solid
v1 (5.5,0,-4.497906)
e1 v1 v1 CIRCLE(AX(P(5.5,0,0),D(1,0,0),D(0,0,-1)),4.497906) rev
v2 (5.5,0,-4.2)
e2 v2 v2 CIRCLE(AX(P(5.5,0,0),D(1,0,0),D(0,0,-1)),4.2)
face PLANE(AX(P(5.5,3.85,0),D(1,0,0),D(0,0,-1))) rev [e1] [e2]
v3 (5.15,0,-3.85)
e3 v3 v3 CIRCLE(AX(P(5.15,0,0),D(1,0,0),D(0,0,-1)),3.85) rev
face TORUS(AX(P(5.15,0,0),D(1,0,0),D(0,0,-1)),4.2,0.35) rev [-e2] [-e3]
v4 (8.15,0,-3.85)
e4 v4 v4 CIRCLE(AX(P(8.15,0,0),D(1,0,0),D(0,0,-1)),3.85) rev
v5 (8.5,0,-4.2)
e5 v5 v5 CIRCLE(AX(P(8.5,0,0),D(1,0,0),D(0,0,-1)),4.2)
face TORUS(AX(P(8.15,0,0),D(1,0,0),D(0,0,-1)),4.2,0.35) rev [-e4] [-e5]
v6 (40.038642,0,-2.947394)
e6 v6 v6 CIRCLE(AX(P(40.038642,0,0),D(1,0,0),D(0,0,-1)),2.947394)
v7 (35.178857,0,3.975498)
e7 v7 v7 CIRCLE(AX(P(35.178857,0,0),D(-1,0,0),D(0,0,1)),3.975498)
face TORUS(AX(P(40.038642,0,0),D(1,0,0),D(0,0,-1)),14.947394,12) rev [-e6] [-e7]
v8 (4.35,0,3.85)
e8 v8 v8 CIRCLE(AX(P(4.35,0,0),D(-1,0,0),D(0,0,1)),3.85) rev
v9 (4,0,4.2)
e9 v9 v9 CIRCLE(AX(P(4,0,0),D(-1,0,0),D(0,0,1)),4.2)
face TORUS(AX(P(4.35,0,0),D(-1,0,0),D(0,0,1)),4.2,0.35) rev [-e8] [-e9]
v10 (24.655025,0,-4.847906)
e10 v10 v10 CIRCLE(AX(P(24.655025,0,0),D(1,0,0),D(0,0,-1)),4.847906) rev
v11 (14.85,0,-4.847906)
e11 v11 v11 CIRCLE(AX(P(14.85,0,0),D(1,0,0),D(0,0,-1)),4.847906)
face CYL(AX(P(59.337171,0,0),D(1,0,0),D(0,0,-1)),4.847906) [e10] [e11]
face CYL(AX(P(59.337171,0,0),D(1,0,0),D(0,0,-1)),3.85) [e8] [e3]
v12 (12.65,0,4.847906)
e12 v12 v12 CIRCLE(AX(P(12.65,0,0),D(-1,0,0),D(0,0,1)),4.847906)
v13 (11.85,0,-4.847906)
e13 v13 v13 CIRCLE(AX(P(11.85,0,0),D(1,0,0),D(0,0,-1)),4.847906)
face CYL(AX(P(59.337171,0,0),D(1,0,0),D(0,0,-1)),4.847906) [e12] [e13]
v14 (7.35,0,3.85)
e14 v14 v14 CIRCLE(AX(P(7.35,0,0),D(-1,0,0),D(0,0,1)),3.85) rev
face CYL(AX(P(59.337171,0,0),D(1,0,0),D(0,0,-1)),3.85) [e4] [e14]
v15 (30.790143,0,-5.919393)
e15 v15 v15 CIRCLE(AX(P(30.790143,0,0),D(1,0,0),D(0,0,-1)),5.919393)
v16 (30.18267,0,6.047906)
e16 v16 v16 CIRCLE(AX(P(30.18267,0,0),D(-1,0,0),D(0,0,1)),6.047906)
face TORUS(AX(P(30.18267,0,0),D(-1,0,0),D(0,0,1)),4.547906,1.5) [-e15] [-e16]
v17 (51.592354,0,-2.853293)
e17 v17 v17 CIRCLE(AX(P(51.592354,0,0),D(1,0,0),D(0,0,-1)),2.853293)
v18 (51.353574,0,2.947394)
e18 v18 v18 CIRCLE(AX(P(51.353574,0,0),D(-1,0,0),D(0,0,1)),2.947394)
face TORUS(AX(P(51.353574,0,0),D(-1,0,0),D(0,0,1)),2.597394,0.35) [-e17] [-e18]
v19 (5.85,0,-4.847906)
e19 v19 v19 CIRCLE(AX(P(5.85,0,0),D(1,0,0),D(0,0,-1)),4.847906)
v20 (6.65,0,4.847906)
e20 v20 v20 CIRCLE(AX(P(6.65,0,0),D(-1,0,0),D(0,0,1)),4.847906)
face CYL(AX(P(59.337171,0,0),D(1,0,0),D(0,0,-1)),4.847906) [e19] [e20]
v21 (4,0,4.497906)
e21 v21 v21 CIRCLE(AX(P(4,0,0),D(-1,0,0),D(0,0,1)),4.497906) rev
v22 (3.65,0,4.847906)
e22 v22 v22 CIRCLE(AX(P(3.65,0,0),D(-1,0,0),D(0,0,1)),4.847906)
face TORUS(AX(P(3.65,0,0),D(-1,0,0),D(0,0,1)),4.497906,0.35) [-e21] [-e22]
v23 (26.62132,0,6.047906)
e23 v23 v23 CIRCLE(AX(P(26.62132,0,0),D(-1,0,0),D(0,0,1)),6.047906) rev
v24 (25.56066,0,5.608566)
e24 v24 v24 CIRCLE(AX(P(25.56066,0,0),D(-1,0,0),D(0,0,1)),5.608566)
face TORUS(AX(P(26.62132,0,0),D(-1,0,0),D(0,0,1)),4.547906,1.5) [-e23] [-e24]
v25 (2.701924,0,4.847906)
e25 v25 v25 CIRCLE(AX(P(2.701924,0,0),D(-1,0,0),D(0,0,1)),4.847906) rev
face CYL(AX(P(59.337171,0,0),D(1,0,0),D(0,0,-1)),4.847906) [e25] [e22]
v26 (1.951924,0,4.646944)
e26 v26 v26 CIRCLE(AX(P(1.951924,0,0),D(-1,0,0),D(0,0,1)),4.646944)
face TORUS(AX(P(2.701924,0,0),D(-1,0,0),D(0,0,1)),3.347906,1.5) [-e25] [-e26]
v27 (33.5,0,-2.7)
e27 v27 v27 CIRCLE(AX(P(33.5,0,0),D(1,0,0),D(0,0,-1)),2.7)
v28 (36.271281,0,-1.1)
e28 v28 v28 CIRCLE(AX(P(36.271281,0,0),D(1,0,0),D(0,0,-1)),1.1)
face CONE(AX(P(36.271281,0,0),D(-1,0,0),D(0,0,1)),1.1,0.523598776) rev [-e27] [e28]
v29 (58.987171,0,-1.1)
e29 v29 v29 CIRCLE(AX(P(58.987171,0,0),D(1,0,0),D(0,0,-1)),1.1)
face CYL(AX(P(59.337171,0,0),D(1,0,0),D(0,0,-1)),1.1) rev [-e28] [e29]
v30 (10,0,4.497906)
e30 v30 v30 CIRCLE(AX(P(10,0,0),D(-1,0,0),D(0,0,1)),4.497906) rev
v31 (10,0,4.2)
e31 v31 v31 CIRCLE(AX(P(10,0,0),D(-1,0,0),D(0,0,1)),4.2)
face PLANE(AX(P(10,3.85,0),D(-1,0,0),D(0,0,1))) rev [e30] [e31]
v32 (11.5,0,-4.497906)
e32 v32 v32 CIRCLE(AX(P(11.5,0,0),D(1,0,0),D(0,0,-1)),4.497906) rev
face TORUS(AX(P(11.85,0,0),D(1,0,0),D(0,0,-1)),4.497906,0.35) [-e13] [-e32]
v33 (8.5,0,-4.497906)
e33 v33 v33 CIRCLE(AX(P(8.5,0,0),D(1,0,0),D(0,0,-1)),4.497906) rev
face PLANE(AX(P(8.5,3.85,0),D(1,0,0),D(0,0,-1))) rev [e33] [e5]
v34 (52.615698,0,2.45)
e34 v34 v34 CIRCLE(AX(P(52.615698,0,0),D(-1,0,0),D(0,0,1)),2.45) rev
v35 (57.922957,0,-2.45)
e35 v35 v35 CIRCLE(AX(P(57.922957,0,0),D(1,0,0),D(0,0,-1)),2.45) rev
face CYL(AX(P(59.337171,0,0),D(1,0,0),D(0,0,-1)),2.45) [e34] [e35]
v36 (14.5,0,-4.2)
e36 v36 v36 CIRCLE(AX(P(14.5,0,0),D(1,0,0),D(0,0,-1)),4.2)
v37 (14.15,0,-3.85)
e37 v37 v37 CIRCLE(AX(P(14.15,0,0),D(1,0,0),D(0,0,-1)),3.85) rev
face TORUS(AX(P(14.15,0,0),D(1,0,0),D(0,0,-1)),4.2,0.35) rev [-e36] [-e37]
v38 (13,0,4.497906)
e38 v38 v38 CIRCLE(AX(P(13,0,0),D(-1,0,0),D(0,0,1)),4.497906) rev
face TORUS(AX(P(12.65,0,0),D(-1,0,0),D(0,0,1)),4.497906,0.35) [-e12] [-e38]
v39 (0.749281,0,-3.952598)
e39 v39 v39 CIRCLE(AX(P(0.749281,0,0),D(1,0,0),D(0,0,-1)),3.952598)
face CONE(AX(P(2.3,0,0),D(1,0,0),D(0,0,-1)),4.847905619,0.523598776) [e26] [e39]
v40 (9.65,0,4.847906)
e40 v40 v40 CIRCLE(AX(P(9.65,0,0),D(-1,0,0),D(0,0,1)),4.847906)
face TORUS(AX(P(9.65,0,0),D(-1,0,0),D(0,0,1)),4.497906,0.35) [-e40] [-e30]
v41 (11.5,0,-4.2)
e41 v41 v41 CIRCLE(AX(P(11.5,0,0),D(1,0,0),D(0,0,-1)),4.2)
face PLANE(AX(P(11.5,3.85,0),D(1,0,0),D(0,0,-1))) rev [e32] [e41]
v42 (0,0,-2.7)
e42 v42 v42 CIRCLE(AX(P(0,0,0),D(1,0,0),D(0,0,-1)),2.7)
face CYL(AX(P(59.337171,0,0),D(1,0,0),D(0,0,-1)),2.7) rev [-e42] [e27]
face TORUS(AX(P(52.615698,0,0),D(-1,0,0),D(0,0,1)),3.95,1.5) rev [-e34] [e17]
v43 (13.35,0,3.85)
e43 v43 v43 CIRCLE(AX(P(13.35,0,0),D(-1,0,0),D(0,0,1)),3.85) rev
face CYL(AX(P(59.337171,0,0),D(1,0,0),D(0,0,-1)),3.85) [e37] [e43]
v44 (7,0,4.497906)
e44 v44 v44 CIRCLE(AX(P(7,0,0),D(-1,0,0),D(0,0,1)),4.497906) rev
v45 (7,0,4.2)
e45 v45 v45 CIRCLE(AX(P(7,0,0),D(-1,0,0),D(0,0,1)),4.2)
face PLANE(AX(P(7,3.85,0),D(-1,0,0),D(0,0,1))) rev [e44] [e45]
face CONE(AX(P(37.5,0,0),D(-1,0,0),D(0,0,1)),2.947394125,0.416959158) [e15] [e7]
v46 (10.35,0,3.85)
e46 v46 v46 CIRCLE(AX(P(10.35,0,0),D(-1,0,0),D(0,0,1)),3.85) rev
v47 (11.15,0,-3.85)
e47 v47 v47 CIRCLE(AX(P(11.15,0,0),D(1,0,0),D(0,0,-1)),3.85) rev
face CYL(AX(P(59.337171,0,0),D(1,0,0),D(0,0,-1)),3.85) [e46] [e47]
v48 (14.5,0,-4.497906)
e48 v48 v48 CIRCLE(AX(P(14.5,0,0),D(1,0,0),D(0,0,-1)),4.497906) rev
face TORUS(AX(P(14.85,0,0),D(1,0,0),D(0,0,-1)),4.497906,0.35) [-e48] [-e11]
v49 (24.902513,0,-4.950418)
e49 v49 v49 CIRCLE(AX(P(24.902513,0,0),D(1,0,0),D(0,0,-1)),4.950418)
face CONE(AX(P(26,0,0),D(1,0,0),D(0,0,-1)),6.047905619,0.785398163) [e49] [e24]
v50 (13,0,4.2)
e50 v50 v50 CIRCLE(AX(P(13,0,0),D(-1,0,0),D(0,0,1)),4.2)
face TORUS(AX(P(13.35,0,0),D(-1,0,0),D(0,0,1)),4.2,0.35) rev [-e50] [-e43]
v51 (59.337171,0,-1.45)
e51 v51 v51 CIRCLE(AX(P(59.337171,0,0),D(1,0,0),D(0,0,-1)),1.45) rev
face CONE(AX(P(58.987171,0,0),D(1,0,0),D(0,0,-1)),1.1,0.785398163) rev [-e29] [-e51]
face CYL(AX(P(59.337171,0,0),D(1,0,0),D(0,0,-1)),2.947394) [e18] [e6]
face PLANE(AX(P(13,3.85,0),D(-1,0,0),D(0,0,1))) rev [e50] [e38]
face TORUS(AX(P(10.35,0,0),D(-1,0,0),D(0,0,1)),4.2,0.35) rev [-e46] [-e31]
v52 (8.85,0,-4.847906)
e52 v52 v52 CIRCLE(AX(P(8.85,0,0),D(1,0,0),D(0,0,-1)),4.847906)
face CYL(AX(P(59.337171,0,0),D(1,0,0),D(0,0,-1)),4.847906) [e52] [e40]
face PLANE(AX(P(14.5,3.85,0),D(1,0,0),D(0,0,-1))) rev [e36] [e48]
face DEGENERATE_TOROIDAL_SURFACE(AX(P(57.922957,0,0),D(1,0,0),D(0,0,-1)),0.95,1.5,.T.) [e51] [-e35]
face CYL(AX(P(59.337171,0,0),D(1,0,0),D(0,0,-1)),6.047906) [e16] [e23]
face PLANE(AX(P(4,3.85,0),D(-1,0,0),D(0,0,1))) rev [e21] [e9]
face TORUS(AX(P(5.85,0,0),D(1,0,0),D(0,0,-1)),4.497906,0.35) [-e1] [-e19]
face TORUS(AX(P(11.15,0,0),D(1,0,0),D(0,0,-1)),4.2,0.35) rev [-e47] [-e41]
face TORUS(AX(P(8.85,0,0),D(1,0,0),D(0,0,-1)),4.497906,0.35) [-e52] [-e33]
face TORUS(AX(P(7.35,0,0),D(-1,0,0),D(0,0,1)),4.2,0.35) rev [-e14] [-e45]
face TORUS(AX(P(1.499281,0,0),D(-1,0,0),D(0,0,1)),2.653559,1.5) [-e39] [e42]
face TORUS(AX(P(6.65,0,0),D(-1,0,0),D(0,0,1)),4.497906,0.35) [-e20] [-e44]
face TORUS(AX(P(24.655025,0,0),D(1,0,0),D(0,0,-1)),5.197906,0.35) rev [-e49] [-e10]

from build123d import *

# Parameters (mm, degrees)
RADYUS1_R = 12
PAH1_SIZE = 0.35
RADYUS2_R = 1.5
RADYUS3_R = 0.35


with BuildPart() as part:
    # Çizim1 → Döndür1 (revolve)
    with BuildSketch(Plane.XY, mode=Mode.PRIVATE) as d_nd_r1_sk:
        Polygon((0, 0), (0, 3.52), (2.2999999999999994, 4.847905619136144), (24.8, 4.847905619136145), (26, 6.047905619136151), (30.5, 6.047905619136152), (37.5, 2.9473941251088362), (51.5, 2.9473941251088362), (51.78717063202492, 2.45), (59.33717063202492, 2.45), (59.33717063202492, 0), align=None)
    revolve(d_nd_r1_sk.sketch.rotate(Axis((59.33717063202492, 0, 0), (-1, 0, 0)), 90), axis=Axis((59.33717063202492, 0, 0), (-1, 0, 0)))

    # Çizim2 → Kes-Döndür1 (revolve, cut)
    with BuildSketch(Plane.XY, mode=Mode.PRIVATE) as kes_d_nd_r1_sk:
        Polygon((0, 0), (0, 2.7), (33.5, 2.7), (36.2712812921102, 1.1), (59.33717063202492, 1.1), (59.33717063202492, 0), align=None)
        Polygon((7, 3.8499999999999925), (7, 4.8499999999999925), (8.5, 4.849999999999992), (8.5, 3.8499999999999925), align=None)
        Polygon((4, 3.8499999999999925), (5.5, 3.8499999999999925), (5.5, 4.849999999999992), (4, 4.8499999999999925), align=None)
        Polygon((10, 3.8499999999999925), (10, 4.8499999999999925), (11.5, 4.849999999999992), (11.5, 3.8499999999999925), align=None)
        Polygon((13.000000000000002, 3.8499999999999925), (13.000000000000002, 4.8499999999999925), (14.5, 4.849999999999992), (14.5, 3.8499999999999925), align=None)
    revolve(kes_d_nd_r1_sk.sketch.rotate(Axis((59.33717063202492, 0, 0), (-1, 0, 0)), 90), axis=Axis((59.33717063202492, 0, 0), (-1, 0, 0)), mode=Mode.SUBTRACT)

    # Radyus1
    radyus1_edges = [part.edges().sort_by_distance(p)[0] for p in [
        (37.5, -6.9e-16, 2.9473941251088362),
    ]]
    fillet(radyus1_edges, radius=RADYUS1_R)

    # Pah1
    pah1_edges = [part.edges().sort_by_distance(p)[0] for p in [
        (59.33717063202492, -2.6e-16, 1.1),
    ]]
    chamfer(pah1_edges, length=PAH1_SIZE)

    # Radyus2
    # the kernel refuses this fillet: 1.5 mm, written as the material it adds along each edge
    with BuildSketch(Plane(origin=(51.78717063202492, 0, 0), x_dir=(0, 1.1e-16, -1), z_dir=(0, 1, 1.1e-16))) as radyus2_piece_1:
        with BuildLine():
            CenterArc((3.95, -0.8285271136184704), RADYUS2_R, 131.94399752487033, 48.056002475129674)
            Line((2.9473941251088394, 0.28717063202491744), (2.927342007611016, 0.3094845869377849))
            ThreePointArc((2.927342007611016, 0.3094845869377849), (2.683697062554418, 0.1695660781259889), (2.4350000000000005, 0.02598076211353373))
            Line((2.4350000000000005, 0.02598076211353373), (2.4200000000000004, 0))
            Line((2.4200000000000004, 0), (2.4200000000000004, -0.8285271136184704))
            Line((2.4200000000000004, -0.8285271136184704), (2.45, -0.8285271136184704))
        make_face()
    revolve(axis=Axis((51.78717063202492, 0, 0), (-1, 0, 0)))
    # the kernel refuses this fillet: 1.5 mm, written as the material it takes off along each edge
    with BuildSketch(Plane(origin=(26, 0, 0), x_dir=(0, 1.1e-16, -1), z_dir=(0, 1, 1.1e-16))) as radyus2_2_piece_1:
        with BuildLine():
            CenterArc((6.047905619136151 - RADYUS2_R, -RADYUS2_R * 0.414213562373), RADYUS2_R, 0, 45.00000000000021)
            Line((6.047905619136151 - RADYUS2_R * 0.292893218813, RADYUS2_R * 0.292893218813), (6.047905619136151 - RADYUS2_R * 0.27875108319, RADYUS2_R * 0.307035354437))
            Line((6.047905619136151 - RADYUS2_R * 0.27875108319, RADYUS2_R * 0.307035354437), (6.047905619136151 + RADYUS2_R * 0.02, RADYUS2_R * 0.00828427124746))
            Line((6.047905619136151 + RADYUS2_R * 0.02, RADYUS2_R * 0.00828427124746), (6.047905619136151 + RADYUS2_R * 0.02, -RADYUS2_R * 0.414213562373))
            Line((6.047905619136151 + RADYUS2_R * 0.02, -RADYUS2_R * 0.414213562373), (6.047905619136151, -RADYUS2_R * 0.414213562373))
        make_face()
    revolve(axis=Axis((26, 0, 0), (-1, 0, 0)), mode=Mode.SUBTRACT)
    with BuildSketch(Plane(origin=(2.299999999999997, 0, 0), x_dir=(0, 1.1e-16, -1), z_dir=(0, 1, 1.1e-16))) as radyus2_2_piece_2:
        with BuildLine():
            CenterArc((4.847905619136144 - RADYUS2_R, -RADYUS2_R * 0.267949192431), RADYUS2_R, 1.696e-14, 30.000000000000057)
            Line((4.847905619136144, -RADYUS2_R * 0.267949192431), (4.847905619136144 + RADYUS2_R * 0.02, -RADYUS2_R * 0.267949192431))
            Line((4.847905619136144 + RADYUS2_R * 0.02, -RADYUS2_R * 0.267949192431), (4.847905619136144 + RADYUS2_R * 0.02, RADYUS2_R * 0.00535898384862))
            Line((4.847905619136144 + RADYUS2_R * 0.02, RADYUS2_R * 0.00535898384862), (4.847905619136144 - RADYUS2_R * 0.11665408814, RADYUS2_R * 0.242050807569))
            Line((4.847905619136144 - RADYUS2_R * 0.11665408814, RADYUS2_R * 0.242050807569), (4.847905619136144 - RADYUS2_R * 0.133974596216, RADYUS2_R * 0.232050807569))
        make_face()
    revolve(axis=Axis((2.299999999999997, 0, 0), (-1, 0, 0)), mode=Mode.SUBTRACT)
    with BuildSketch(Plane(origin=(0, 0, 0), x_dir=(0, 1.1e-16, -1), z_dir=(0, 1, 1.1e-16))) as radyus2_2_piece_3:
        with BuildLine():
            CenterArc((2.653559434569093, -1.4992809189349605), RADYUS2_R, 30.0000000000001, 58.22581755245369)
            Line((3.95259754024575, -0.7492809189349583), (3.978578302359283, -0.7342809189349583))
            Line((3.978578302359283, -0.7342809189349583), (3.5459807621135333, 0.01500000000000004))
            Line((3.5459807621135333, 0.01500000000000004), (3.52, 0.03))
            ThreePointArc((3.52, 0.03), (3.1100000000000003, 0.03), (2.7009288113086183, 0.02998561837869853))
            Line((2.7009288113086183, 0.02998561837869853), (2.7, -6.7e-16))
        make_face()
    revolve(axis=Axis((0, 0, 0), (-1, 0, 0)), mode=Mode.SUBTRACT)
    with BuildSketch(Plane(origin=(59.33717063202492, 0, 0), x_dir=(0, 1.1e-16, -1), z_dir=(0, 1, 1.1e-16))) as radyus2_2_piece_4:
        with BuildLine():
            CenterArc((0.9500000000000002, 1.4142135623730923), RADYUS2_R, 289.47122063449075, 70.52877936550924)
            Line((2.45, 1.4142135623730923), (2.48, 1.4142135623730923))
            Line((2.48, 1.4142135623730923), (2.48, 0))
            Line((2.48, 0), (2.45, -0.03000000000000114))
            ThreePointArc((2.45, -0.03000000000000114), (1.9500000000000006, -0.03000000000000114), (1.460000000000001, -0.02828427124746469))
            Line((1.460000000000001, -0.02828427124746469), (1.450000000000001, 0))
        make_face()
    revolve(axis=Axis((59.33717063202492, 0, 0), (-1, 0, 0)), mode=Mode.SUBTRACT)
    with BuildSketch(Plane(origin=(30.5, 0, 0), x_dir=(0, 1.1e-16, -1), z_dir=(0, 1, 1.1e-16))) as radyus2_2_piece_5:
        with BuildLine():
            CenterArc((6.047905619136152 - RADYUS2_R, RADYUS2_R * 0.211553464978), RADYUS2_R, 336.11, 23.88999999999998)
            Line((6.047905619136152, RADYUS2_R * 0.211553464978), (6.047905619136152 + RADYUS2_R * 0.02, RADYUS2_R * 0.211553464978))
            Line((6.047905619136152 + RADYUS2_R * 0.02, RADYUS2_R * 0.211553464978), (6.047905619136152 + RADYUS2_R * 0.02, -RADYUS2_R * 0.00423106929956))
            Line((6.047905619136152 + RADYUS2_R * 0.02, -RADYUS2_R * 0.00423106929956), (6.047905619136152 - RADYUS2_R * 0.0673888551076, -RADYUS2_R * 0.201528188479))
            Line((6.047905619136152 - RADYUS2_R * 0.0673888551076, -RADYUS2_R * 0.201528188479), (6.047905619136152 - RADYUS2_R * 0.0856753481447, -RADYUS2_R * 0.193428548215))
        make_face()
    revolve(axis=Axis((30.5, 0, 0), (-1, 0, 0)), mode=Mode.SUBTRACT)

    # Radyus3
    radyus3_edges = [part.edges().sort_by_distance(p)[0] for p in [
        (24.799999999999997, -1.13e-15, 4.847905619136145),
        (14.5, 6e-17, 4.847905619136144),
        (13, 6e-17, 4.847905619136144),
        (14.5, -9e-16, 3.8499999999999925),
        (13, -9e-16, 3.8499999999999925),
        (11.5, 6e-17, 4.847905619136144),
        (10, 6e-17, 4.847905619136144),
        (11.5, -9e-16, 3.8499999999999925),
        (10, -9e-16, 3.8499999999999925),
        (8.5, 6e-17, 4.847905619136144),
        (7, 6e-17, 4.847905619136144),
        (8.5, -9e-16, 3.8499999999999925),
        (7, -9e-16, 3.8499999999999925),
        (4, 6e-17, 4.847905619136144),
        (5.5, 6e-17, 4.847905619136144),
        (4, -9e-16, 3.8499999999999925),
        (5.5, -9e-16, 3.8499999999999925),
        (51.5, -6.9e-16, 2.9473941251088362),
    ]]
    fillet(radyus3_edges, radius=RADYUS3_R)


solid = part.part
